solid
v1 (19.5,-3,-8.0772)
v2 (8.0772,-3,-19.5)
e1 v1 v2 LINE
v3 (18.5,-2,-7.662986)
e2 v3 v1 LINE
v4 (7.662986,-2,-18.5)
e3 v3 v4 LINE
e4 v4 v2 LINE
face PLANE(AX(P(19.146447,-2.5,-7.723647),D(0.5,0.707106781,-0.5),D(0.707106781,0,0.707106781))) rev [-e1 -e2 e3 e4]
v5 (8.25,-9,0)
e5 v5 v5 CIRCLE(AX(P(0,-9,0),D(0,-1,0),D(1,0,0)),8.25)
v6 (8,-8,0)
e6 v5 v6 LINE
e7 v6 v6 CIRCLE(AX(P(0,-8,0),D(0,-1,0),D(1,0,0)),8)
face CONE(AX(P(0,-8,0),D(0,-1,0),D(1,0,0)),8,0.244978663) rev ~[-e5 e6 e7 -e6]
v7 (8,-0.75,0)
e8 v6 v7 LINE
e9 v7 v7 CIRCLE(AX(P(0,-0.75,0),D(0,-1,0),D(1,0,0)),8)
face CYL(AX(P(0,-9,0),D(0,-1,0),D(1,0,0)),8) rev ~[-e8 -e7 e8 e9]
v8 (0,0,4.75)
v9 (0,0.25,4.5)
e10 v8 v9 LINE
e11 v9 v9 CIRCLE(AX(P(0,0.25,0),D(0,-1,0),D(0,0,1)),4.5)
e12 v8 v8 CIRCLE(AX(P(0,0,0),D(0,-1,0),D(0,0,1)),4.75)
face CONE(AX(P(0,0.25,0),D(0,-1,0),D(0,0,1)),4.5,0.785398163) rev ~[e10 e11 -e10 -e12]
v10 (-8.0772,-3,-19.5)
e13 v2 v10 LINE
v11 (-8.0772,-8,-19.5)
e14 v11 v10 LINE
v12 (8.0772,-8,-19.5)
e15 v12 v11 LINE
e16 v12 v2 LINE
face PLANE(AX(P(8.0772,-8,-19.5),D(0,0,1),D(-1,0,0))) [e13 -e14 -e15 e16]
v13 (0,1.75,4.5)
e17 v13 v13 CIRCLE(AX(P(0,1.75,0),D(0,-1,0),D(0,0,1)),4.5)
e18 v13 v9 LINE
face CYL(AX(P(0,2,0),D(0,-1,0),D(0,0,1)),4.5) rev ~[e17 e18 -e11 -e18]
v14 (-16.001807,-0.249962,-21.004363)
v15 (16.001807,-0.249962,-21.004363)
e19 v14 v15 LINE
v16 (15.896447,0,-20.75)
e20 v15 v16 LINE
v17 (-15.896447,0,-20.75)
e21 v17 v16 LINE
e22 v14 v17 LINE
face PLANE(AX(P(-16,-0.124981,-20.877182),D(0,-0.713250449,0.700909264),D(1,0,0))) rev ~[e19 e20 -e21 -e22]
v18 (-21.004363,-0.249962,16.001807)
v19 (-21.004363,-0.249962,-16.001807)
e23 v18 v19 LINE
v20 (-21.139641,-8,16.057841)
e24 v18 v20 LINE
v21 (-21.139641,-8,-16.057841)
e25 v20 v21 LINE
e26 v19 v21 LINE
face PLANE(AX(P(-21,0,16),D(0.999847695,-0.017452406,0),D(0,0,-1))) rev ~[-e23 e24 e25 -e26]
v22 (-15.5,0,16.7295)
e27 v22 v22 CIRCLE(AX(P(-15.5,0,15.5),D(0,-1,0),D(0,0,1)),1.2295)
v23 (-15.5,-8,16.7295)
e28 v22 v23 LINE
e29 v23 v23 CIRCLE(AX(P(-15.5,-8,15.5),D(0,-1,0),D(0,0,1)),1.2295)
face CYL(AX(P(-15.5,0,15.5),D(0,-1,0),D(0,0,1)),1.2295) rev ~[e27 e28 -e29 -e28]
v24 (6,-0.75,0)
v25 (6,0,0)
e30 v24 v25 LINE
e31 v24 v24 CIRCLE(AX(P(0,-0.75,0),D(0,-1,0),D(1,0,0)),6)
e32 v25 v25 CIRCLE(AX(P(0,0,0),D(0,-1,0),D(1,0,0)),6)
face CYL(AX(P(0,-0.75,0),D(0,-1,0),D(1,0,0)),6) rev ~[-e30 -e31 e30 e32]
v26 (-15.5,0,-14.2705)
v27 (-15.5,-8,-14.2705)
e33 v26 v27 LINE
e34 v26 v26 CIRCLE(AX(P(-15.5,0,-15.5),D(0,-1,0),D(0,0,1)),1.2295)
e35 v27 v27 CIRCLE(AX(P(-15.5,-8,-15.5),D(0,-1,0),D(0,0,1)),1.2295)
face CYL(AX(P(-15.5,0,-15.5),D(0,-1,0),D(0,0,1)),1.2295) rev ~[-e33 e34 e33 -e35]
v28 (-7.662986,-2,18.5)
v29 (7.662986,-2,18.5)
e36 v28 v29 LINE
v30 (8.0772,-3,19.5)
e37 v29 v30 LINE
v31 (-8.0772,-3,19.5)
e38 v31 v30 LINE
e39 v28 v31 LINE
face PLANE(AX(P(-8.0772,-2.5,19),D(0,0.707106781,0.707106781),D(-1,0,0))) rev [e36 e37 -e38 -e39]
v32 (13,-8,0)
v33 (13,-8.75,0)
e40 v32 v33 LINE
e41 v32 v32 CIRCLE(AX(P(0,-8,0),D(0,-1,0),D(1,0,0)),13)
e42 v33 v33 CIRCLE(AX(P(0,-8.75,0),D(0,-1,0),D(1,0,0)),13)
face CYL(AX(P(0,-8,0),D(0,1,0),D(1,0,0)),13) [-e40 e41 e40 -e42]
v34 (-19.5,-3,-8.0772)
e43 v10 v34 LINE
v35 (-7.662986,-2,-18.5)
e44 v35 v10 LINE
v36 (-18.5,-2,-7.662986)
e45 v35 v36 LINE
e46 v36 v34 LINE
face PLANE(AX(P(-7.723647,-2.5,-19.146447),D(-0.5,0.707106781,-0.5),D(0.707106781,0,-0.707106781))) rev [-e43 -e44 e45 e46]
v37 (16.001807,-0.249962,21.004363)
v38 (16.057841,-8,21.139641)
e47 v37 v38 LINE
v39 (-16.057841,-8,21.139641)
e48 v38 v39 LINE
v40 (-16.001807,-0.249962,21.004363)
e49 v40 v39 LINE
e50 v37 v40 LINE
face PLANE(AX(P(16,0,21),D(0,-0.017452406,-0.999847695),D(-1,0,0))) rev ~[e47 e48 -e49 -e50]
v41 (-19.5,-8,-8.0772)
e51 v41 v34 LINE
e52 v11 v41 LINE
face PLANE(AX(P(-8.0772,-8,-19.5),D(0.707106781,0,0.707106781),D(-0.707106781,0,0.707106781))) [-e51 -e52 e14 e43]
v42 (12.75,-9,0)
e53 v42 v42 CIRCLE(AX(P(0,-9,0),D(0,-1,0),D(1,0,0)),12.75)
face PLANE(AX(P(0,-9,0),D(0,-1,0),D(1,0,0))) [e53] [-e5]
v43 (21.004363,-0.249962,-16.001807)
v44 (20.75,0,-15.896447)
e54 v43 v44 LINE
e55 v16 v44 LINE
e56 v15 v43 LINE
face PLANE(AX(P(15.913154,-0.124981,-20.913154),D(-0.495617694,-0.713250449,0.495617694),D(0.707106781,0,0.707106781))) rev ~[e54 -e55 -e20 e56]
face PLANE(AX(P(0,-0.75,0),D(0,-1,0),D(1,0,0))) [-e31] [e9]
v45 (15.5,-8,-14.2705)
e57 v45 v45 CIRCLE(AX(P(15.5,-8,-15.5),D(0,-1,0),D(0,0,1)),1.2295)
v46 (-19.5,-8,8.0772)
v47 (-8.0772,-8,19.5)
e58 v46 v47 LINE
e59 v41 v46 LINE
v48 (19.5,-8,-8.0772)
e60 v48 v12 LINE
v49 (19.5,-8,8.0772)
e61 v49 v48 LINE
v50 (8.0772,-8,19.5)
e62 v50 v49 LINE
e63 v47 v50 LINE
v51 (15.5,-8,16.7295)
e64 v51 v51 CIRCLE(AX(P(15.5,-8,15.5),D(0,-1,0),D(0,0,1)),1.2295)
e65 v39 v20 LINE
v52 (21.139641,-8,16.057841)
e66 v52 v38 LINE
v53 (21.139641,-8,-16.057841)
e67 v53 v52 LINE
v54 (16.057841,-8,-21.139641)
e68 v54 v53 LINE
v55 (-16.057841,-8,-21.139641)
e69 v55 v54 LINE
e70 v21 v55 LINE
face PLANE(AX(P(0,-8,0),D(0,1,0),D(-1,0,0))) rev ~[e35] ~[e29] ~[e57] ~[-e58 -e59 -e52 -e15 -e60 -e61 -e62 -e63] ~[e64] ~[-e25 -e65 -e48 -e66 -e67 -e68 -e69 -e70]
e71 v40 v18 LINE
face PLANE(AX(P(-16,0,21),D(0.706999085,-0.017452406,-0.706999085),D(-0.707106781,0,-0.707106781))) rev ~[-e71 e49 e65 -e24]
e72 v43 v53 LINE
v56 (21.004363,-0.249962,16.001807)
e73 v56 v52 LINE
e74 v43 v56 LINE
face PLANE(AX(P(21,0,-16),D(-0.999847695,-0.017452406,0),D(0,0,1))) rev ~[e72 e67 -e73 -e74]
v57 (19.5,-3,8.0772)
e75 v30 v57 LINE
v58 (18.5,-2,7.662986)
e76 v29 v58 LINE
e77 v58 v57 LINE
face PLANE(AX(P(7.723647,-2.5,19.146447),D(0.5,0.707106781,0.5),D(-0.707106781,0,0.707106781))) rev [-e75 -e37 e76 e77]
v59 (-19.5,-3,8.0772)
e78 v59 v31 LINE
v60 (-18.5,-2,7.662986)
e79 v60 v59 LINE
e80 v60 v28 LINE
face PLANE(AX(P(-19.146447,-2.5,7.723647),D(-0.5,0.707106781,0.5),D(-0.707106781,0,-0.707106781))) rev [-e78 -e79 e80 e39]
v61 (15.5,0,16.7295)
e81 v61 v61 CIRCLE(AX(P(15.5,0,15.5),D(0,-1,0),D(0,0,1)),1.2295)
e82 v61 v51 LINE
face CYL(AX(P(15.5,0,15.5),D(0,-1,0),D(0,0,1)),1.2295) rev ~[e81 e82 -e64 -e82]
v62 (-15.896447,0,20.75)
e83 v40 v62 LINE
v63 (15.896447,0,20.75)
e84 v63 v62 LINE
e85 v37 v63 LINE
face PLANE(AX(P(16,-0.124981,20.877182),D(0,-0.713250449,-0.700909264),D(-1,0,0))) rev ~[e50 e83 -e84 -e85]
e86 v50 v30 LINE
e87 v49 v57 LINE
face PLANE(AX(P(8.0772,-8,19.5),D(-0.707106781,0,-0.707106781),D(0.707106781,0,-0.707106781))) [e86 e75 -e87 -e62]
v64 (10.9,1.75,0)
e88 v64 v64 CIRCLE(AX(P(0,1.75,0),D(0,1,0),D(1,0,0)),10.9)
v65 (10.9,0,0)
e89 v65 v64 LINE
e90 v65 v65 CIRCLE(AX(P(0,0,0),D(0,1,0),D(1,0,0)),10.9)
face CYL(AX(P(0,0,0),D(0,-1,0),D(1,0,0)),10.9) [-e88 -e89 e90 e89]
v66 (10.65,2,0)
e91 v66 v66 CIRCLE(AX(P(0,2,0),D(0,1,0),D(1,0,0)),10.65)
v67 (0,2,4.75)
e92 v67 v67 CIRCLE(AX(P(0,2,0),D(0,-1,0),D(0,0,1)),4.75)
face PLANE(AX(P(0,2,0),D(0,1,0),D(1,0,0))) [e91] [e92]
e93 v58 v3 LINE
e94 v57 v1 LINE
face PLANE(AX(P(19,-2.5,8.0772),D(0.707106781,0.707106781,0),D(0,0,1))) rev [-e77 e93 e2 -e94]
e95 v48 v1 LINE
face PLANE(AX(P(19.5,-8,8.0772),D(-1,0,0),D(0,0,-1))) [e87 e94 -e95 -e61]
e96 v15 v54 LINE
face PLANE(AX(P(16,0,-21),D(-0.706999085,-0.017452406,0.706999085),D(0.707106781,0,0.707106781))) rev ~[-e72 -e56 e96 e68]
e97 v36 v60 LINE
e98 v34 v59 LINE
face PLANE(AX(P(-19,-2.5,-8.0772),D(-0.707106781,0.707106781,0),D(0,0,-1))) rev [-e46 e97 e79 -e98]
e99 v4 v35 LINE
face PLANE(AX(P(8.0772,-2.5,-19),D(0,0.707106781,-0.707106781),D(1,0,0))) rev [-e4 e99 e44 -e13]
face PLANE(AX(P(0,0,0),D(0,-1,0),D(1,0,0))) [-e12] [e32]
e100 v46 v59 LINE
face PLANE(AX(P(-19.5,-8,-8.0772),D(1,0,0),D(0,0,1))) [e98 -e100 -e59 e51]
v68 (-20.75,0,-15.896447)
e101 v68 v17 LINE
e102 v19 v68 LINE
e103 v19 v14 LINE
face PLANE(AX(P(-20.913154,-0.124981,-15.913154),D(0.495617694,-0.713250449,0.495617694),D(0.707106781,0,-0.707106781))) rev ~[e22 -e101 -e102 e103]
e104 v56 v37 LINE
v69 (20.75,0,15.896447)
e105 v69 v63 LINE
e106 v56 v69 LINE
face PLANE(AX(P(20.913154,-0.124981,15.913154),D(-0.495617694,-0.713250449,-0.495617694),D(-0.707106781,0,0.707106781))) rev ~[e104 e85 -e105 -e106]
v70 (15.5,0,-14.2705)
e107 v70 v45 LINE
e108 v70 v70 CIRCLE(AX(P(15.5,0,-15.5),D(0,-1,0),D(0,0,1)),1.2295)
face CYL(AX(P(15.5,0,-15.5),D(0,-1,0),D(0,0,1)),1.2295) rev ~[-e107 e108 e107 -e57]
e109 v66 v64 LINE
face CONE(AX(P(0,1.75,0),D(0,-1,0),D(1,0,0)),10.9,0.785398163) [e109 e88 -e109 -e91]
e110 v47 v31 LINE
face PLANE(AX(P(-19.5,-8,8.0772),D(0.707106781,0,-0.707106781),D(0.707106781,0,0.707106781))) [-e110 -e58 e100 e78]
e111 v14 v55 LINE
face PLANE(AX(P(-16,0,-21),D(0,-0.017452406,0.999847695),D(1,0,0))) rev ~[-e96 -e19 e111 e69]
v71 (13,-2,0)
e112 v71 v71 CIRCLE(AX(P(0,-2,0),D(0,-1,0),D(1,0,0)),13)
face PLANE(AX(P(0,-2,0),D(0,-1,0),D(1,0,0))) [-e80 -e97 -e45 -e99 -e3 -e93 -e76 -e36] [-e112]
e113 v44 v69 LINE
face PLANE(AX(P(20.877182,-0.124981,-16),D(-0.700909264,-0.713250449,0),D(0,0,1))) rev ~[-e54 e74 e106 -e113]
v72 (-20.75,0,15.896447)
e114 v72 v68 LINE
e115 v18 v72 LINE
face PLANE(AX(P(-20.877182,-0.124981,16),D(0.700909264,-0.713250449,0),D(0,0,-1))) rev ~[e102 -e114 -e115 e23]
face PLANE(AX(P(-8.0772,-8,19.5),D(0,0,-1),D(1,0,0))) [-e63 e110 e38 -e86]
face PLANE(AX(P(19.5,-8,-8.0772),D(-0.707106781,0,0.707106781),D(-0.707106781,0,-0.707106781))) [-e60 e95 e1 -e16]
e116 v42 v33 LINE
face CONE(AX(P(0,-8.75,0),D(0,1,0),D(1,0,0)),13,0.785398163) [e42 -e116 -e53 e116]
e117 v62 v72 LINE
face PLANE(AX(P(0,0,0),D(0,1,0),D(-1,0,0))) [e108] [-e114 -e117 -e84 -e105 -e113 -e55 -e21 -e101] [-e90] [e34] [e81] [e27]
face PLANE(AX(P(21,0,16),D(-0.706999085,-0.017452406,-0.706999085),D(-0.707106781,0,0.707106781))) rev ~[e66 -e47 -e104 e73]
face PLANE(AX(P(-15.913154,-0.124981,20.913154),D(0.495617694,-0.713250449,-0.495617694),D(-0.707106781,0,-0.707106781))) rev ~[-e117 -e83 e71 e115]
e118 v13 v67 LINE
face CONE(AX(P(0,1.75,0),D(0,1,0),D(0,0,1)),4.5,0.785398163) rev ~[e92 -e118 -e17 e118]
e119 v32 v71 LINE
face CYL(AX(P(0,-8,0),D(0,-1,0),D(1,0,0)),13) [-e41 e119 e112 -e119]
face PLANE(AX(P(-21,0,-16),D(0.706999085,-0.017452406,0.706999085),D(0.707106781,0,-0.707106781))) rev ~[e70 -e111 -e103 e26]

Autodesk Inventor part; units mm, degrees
ref_plane "YZ Plane" through (0, 0, 0) normal (1, 0, 0) x (0, 1, 0)
ref_plane "XZ Plane" through (0, 0, 0) normal (0, 1, 0) x (-1, 0, 0)
ref_plane "XY Plane" through (0, 0, 0) normal (0, 0, 1) x (1, 0, 0)
sketch "Sketch11" plane through (0, 0, 0) normal (0, 1, 0) x (-1, 0, 0)
  line L0 (-16, 21) -> (16, 21)
  line L1 (21, 16) -> (21, -16)
  line L2 (16, -21) -> (-16, -21)
  line L3 (-21, -16) -> (-21, 16)
  line L4 (-21, 21) -> (21, -21) construction
  line L5 (21, 21) -> (-21, -21) construction
  line L6 (21, -16) -> (16, -21)
  line L7 (-16, -21) -> (-21, -16)
  line L8 (-21, 16) -> (-16, 21)
  line L9 (16, 21) -> (21, 16)
  point P0 (0, 0)
  dimension "d82" = 42
  dimension "d83" = 5
  dimension "d84" = 5
  dimension "d85" = 5
  dimension "d86" = 5
  dimension "d87" = 5
  dimension "d88" = 5
  dimension "d89" = 5
  dimension "d90" = 5
extrude "Extrusion7" add sketch "Sketch11" against normal blind 8 draft 1
sketch "Sketch12" plane through (0, 0, 0) normal (0, 1, 0) x (1, 0, 0)
  circle A0 centre (0, 0) radius 10.9
  dimension "d93" = 21.8
extrude "Extrusion8" add sketch "Sketch12" along normal blind 2
sketch "Sketch13" plane through (0, -8, 0) normal (0, -1, 0) x (1, 0, 0)
  circle A0 centre (0, 0) radius 13
  line L0 (-8.0772, 19.5) -> (8.0772, 19.5)
  line L1 (8.0772, 19.5) -> (19.5, 8.0772)
  line L2 (19.5, 8.0772) -> (19.5, -8.0772)
  line L3 (19.5, -8.0772) -> (8.0772, -19.5)
  line L4 (8.0772, -19.5) -> (-8.0772, -19.5)
  line L5 (-8.0772, -19.5) -> (-19.5, -8.0772)
  line L6 (-19.5, -8.0772) -> (-19.5, 8.0772)
  line L7 (-19.5, 8.0772) -> (-8.0772, 19.5)
  dimension "d96" = 26
  dimension "d97" = 39
extrude "Extrusion9" cut sketch "Sketch13" against normal blind 6
sketch "Sketch14" plane through (0, -8, 0) normal (0, -1, 0) x (1, 0, 0)
  circle A0 centre (0, 0) radius 13 projected
extrude "Extrusion10" add sketch "Sketch14" along normal blind 1
sketch "Sketch15" plane through (0, -9, 0) normal (0, -1, 0) x (1, 0, 0)
  circle A0 centre (0, 0) radius 8
  dimension "d102" = 16
extrude "Extrusion11" cut sketch "Sketch15" against normal blind 8.25
sketch "Sketch16" plane through (0, 2, 0) normal (0, 1, 0) x (1, 0, 0)
  point P0 (0, 0)
  point P1 (0, 0)
hole "Hole5" at (0, 2, 0) direction (0, -1, 0) diameter 9 end through all
sketch "Sketch17" plane through (0, -0.75, 0) normal (0, -1, 0) x (1, 0, 0)
  circle A0 centre (0, 0) radius 6
  dimension "d112" = 12
extrude "Extrusion12" cut sketch "Sketch17" against normal blind 0.75
sketch "Sketch18" plane through (0, 0, 0) normal (0, 1, 0) x (1, 0, 0)
  line L0 (-15.5, 15.5) -> (15.5, 15.5) construction
  line L1 (15.5, 15.5) -> (15.5, -15.5) construction
  line L2 (15.5, -15.5) -> (-15.5, -15.5) construction
  line L3 (-15.5, -15.5) -> (-15.5, 15.5) construction
  line L4 (-15.5, 15.5) -> (15.5, -15.5) construction
  line L5 (15.5, 15.5) -> (-15.5, -15.5) construction
  point P0 (0, 0)
  point P1 (0, 0)
  dimension "d115" = 31
  dimension "d124" = 31
hole "Hole6" at (-15.5, 0, -15.5) at (15.5, 0, -15.5) at (15.5, 0, 15.5) at (-15.5, 0, 15.5) direction (0, -1, 0) diameter 2.459 end through all thread size "M3x0.5" class "6H" standard "ISO Metric profile"
chamfer "Chamfer1" distance 0.25 distance2 1 1 edges at (-8, -9, 0) measured on face at (11.1299, -9, -1.6752)
chamfer "Chamfer2" distance 0.25 angle 45 12 edges at (-13, -9, 0) (0, 0, -4.5) (0, 2, -4.5) (-10.9, 2, 0) (-21, 0, 0) (-18.5, 0, 18.5) (0, 0, 21) (18.5, 0, 18.5) (21, 0, 0) (18.5, 0, -18.5) (0, 0, -21) (-18.5, 0, -18.5)
chamfer "Chamfer3" distance 1 angle 45 8 edges at (-13.7886, -2, -13.7886) (-19.5, -2, 0) (-13.7886, -2, 13.7886) (0, -2, 19.5) (13.7886, -2, 13.7886) (19.5, -2, 0) (13.7886, -2, -13.7886) (0, -2, -19.5)
equation "\"d84\" = d83"
equation "\"d85\" = d83"
equation "\"d86\" = d85"
equation "\"d87\" = d83"
equation "\"d88\" = d87"
equation "\"d89\" = d83"
equation "\"d90\" = d89"
properties part number "Nema 17 Top Cap" material "Aluminum 6061"
